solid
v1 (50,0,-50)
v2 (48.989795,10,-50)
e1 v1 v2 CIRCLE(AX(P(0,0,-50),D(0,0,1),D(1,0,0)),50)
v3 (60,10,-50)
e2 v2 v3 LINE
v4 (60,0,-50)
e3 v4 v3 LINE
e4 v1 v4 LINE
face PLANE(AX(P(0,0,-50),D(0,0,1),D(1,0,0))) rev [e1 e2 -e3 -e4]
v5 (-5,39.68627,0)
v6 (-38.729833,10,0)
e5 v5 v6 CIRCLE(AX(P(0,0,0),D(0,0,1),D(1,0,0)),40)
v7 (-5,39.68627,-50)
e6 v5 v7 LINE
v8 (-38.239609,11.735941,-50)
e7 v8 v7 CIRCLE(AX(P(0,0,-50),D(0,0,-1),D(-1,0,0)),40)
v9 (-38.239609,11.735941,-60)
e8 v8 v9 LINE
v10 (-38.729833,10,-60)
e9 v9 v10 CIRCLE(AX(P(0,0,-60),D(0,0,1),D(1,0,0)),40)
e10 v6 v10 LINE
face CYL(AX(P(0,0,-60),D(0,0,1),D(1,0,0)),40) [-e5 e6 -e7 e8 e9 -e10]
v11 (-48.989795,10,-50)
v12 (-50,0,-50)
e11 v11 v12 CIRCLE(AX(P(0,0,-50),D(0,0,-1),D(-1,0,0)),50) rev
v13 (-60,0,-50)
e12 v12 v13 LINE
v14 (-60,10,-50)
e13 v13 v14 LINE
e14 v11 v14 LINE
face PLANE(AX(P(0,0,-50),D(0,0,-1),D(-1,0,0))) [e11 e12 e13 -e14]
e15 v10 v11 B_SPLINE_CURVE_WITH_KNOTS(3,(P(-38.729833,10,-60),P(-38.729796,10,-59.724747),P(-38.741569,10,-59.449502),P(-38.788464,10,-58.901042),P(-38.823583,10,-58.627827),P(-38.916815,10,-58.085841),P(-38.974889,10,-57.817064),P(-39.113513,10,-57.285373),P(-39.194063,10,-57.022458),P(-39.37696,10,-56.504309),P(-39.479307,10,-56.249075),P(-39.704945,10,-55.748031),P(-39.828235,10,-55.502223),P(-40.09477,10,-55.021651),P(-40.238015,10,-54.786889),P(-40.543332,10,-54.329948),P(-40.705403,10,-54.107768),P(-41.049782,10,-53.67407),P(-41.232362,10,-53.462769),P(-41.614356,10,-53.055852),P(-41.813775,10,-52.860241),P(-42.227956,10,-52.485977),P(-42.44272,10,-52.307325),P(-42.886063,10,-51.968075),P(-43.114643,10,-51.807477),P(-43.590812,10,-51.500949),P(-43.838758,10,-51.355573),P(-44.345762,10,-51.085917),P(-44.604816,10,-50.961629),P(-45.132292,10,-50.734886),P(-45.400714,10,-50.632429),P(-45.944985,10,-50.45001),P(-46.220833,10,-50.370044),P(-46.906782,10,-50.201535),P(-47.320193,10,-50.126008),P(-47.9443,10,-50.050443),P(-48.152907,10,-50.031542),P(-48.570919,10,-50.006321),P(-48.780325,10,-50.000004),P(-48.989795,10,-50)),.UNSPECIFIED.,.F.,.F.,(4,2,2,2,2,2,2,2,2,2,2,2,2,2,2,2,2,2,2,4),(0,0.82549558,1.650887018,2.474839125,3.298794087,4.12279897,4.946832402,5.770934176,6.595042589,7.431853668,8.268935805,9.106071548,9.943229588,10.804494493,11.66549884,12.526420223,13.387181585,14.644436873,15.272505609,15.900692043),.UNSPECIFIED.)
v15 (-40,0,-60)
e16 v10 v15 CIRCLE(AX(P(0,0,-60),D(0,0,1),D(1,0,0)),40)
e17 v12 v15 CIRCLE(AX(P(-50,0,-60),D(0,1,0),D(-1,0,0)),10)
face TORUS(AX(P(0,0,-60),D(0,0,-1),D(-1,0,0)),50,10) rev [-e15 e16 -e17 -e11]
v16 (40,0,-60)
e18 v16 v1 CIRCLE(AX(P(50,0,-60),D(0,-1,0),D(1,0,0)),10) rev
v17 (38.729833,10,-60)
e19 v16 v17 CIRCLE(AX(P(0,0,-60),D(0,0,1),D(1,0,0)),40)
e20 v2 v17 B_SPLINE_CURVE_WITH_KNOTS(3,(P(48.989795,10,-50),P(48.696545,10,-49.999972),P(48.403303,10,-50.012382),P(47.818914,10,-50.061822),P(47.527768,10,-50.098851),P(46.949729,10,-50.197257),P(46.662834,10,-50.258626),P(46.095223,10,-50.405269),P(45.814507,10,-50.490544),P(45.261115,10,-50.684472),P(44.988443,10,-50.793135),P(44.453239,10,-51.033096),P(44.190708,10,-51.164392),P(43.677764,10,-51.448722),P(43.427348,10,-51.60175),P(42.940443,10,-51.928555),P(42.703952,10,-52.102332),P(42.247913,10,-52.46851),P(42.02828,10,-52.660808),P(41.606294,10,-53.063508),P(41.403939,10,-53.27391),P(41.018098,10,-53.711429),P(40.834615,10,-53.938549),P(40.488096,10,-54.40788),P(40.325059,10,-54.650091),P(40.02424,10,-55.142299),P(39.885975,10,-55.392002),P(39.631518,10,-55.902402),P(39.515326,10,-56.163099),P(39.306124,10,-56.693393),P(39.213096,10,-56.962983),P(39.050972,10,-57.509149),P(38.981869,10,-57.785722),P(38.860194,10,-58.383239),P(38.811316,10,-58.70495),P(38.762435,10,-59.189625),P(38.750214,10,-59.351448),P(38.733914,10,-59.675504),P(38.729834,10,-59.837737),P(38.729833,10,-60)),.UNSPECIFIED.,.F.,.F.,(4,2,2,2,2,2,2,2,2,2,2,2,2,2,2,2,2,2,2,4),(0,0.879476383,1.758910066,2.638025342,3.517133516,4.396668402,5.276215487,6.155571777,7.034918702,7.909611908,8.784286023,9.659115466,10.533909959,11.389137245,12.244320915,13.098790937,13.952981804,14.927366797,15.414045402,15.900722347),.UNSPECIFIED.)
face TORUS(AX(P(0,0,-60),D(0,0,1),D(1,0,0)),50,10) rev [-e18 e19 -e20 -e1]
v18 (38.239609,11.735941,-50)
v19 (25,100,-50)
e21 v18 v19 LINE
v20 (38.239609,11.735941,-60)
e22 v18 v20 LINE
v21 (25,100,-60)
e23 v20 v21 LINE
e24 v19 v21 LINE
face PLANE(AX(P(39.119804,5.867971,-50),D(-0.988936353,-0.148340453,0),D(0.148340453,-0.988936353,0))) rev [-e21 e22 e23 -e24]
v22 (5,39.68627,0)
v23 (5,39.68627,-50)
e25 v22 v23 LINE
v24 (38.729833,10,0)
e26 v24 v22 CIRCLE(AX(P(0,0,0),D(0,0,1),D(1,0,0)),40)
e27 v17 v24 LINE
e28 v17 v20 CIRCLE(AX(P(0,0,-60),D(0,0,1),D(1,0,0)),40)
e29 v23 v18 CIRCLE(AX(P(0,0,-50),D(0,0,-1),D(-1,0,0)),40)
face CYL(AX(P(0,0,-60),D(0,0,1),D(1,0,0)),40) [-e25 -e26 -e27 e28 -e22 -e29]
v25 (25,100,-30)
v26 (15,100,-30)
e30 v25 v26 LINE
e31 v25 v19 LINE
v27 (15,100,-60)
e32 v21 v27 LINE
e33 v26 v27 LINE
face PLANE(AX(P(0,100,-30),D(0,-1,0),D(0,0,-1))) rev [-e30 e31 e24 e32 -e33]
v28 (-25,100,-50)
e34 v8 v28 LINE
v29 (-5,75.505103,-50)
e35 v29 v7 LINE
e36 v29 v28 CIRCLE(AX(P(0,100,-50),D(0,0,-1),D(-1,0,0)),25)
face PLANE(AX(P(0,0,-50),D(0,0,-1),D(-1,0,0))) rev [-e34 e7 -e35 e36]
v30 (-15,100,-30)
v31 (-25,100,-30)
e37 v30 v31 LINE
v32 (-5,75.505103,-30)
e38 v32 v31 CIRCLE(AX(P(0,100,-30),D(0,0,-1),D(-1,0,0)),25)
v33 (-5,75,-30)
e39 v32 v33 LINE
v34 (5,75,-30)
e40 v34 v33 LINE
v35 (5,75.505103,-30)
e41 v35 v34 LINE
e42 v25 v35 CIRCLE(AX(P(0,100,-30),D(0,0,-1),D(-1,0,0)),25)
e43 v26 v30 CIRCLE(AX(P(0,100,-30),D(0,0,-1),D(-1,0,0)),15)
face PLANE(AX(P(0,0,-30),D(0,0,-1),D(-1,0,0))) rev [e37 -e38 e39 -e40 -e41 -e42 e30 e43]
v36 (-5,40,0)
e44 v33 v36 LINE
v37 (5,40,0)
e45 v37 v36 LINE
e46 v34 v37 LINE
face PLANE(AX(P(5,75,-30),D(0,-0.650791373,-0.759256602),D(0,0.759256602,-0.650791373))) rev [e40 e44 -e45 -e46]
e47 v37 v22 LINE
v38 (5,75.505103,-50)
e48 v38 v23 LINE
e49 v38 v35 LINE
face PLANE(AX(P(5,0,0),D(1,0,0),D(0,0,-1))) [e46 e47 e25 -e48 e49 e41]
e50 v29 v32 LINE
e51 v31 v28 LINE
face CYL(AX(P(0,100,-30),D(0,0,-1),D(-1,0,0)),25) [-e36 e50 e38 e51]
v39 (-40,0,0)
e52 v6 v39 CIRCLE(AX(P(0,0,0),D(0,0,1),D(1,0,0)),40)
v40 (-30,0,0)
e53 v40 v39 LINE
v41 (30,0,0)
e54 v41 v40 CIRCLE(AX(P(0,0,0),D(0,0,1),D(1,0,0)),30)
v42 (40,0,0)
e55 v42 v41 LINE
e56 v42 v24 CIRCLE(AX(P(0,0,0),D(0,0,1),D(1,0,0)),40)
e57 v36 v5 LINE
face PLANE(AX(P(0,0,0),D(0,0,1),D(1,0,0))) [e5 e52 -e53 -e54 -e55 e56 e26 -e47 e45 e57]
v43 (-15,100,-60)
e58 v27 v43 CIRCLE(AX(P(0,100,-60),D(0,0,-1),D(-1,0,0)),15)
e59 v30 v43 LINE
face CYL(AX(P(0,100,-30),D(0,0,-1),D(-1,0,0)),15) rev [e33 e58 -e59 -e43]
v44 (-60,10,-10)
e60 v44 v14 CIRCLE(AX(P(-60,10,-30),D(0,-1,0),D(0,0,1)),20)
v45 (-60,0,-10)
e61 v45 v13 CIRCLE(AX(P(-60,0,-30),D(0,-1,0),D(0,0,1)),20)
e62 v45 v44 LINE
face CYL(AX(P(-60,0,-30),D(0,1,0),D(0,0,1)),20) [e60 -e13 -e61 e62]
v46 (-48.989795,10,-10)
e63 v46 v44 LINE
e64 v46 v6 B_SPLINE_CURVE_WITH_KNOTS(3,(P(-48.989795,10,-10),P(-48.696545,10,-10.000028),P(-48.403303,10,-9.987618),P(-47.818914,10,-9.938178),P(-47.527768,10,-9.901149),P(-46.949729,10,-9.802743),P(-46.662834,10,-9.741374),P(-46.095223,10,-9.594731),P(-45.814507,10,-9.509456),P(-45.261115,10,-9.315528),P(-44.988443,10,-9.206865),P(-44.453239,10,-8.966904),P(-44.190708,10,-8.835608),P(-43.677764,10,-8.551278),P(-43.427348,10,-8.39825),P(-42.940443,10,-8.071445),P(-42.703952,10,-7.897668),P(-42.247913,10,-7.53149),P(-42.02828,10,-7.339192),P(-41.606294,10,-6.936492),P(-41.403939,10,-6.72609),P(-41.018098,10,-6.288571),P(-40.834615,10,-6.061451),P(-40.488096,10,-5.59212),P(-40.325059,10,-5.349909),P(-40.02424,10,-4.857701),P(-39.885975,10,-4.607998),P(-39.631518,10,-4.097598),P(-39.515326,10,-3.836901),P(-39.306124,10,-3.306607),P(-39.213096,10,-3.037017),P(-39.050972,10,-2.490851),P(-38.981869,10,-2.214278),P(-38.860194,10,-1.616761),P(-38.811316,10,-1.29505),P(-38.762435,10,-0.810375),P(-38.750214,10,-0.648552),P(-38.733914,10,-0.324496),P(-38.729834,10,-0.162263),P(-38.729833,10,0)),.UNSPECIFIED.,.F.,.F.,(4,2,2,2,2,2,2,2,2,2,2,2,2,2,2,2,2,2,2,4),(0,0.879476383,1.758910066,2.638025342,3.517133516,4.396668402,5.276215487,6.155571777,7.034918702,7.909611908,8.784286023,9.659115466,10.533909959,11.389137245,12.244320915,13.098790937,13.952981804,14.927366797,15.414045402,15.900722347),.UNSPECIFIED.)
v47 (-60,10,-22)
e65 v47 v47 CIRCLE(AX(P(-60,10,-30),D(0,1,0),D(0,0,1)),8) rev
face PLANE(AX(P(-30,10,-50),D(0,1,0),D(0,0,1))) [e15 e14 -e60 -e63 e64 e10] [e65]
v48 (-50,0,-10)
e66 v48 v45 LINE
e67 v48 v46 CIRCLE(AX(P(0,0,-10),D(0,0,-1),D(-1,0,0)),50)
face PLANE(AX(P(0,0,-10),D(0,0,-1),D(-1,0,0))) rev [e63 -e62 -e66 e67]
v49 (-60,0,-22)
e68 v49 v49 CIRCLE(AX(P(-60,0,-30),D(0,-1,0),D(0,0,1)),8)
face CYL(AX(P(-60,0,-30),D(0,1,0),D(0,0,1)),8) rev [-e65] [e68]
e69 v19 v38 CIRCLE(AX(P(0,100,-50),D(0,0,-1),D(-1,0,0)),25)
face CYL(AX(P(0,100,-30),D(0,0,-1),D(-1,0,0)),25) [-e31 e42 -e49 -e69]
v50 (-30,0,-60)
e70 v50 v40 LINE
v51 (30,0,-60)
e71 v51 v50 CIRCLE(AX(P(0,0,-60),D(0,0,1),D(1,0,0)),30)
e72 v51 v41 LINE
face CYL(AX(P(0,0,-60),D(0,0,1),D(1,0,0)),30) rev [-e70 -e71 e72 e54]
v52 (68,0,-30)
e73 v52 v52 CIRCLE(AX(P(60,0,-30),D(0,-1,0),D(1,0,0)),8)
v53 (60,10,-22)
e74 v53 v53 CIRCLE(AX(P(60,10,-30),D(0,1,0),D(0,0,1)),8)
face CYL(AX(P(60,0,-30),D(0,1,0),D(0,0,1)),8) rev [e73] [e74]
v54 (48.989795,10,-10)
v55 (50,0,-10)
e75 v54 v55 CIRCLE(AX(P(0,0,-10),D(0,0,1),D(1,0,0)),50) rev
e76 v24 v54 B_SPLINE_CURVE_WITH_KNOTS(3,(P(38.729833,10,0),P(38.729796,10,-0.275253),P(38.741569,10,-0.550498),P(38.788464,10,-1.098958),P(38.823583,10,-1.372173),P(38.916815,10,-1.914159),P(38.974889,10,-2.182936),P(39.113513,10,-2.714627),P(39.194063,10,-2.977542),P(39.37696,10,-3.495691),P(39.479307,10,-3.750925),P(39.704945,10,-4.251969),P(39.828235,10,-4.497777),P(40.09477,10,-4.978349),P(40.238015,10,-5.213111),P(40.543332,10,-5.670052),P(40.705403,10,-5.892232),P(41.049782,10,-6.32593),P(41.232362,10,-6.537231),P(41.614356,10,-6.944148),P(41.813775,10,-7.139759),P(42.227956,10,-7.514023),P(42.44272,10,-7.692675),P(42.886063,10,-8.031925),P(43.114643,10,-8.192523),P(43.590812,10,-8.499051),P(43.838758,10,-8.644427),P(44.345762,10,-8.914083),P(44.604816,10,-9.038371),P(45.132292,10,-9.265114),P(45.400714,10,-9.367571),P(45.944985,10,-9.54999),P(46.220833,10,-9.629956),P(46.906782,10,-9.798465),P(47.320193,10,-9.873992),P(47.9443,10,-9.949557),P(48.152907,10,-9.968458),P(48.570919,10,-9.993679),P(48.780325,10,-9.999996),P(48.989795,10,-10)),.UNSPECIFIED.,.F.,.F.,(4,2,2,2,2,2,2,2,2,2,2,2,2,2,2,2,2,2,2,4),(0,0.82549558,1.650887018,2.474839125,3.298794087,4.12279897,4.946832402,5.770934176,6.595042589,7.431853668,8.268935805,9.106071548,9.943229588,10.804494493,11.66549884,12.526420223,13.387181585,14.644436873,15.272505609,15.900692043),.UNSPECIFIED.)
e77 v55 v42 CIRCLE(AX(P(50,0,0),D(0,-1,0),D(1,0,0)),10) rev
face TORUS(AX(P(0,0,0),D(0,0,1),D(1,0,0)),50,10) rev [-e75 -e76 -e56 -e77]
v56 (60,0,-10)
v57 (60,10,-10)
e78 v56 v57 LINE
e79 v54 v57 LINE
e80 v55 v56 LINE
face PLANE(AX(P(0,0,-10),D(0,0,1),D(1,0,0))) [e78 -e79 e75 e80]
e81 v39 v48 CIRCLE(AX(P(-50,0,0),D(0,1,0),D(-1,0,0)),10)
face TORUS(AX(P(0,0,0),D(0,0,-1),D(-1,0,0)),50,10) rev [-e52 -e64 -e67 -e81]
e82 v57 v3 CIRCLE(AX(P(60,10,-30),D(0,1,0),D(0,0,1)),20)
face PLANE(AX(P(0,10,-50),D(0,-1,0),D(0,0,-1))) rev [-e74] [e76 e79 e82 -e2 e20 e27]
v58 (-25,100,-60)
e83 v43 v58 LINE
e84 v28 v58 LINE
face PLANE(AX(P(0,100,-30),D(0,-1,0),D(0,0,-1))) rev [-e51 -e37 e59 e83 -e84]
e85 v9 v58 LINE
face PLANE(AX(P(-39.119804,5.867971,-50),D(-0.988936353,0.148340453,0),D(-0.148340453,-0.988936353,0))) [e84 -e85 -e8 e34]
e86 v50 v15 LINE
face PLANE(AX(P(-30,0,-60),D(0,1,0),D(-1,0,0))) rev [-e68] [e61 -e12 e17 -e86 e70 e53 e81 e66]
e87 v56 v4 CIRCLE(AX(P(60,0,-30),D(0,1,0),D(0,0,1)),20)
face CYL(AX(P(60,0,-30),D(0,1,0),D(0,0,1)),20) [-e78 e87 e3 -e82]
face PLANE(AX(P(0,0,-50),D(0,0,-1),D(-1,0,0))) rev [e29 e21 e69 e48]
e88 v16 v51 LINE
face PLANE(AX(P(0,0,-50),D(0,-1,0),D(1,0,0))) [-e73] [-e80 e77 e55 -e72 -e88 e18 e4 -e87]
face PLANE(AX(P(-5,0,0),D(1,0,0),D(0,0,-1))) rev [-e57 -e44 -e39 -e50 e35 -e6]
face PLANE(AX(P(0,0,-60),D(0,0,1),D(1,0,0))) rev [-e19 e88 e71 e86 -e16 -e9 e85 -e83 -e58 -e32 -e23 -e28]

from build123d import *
from build123d.topology import SkipClean

# Parameters (mm, degrees)
BOSS_EXTRUDE1_START   = -10
BOSS_EXTRUDE1_DEPTH   = 40
SKETCH1_W             = 30
SKETCH1_H             = 10
BOSS_EXTRUDE1_2_DEPTH = 40
EXTRUDE_THIN1_DEPTH   = 60
BOSS_EXTRUDE2_DEPTH   = 30
BOSS_EXTRUDE3_START   = -10
BOSS_EXTRUDE3_DEPTH   = 10
FILLET2_R             = 10
BOSS_EXTRUDE4_DEPTH   = 5
CUT_EXTRUDE1_DEPTH    = 124.693168817
BOSS_EXTRUDE6_DEPTH   = 10


with BuildPart() as part:
    # Sketch1 → Boss-Extrude1 (new body)
    with BuildSketch(Plane.XY.offset(BOSS_EXTRUDE1_START)):
        with BuildLine():
            Line((60, 10), (38.729833462, 10))
            ThreePointArc((38.729833462, 10), (39.681187851, 5.040171699), (40, 0))
            Line((40, 0), (60, 0))
            Line((60, 0), (60, 10))
        make_face()
    extrude(amount=-BOSS_EXTRUDE1_DEPTH)



with BuildPart() as body_2:
    # Sketch1 → Boss-Extrude1 2 (new body)
    with BuildSketch(Plane.XY.offset(BOSS_EXTRUDE1_START)):
        with Locations((-45, 5)):
            Rectangle(SKETCH1_W, SKETCH1_H)
    extrude(amount=-BOSS_EXTRUDE1_2_DEPTH)


with BuildPart() as part_1:
    add(part.part)

    add(body_2.part)  # Extrude-Thin1 merges body 2
    # Sketch1<3> → Extrude-Thin1 (add)
    with BuildSketch(Plane.XY):
        with BuildLine():
            ThreePointArc((30, 0), (0, 30), (-30, 0))
            Line((-30, 0), (-40, 0))
            ThreePointArc((-40, 0), (0, 40), (40, 0))
            Line((40, 0), (30, 0))
        make_face()
    extrude(amount=-EXTRUDE_THIN1_DEPTH)



with BuildPart() as body_2_2:
    # Sketch2 → Boss-Extrude2 (new body)
    with BuildSketch(Plane(origin=(0, 0, -60), x_dir=(-1, 0, 0), z_dir=(0, 0, -1))):
        with BuildLine():
            ThreePointArc((-25, 100), (-17.67766953, 82.32233047), (0, 75))
            Line((0, 75), (0, 85))
            ThreePointArc((0, 85), (-10.606601718, 89.393398282), (-15, 100))
            Line((-15, 100), (-25, 100))
        make_face()
        with BuildLine():
            Line((0, 85), (0, 75))
            ThreePointArc((0, 75), (17.67766953, 82.32233047), (25, 100))
            Line((25, 100), (15, 100))
            ThreePointArc((15, 100), (10.606601718, 89.393398282), (0, 85))
        make_face()
    extrude(amount=-BOSS_EXTRUDE2_DEPTH)


with BuildPart() as part_2:
    add(part_1.part)

    add(body_2_2.part)  # Boss-Extrude3 merges body 2 2
    # Sketch2<5> → Boss-Extrude3 (add)
    with BuildSketch(Plane(origin=(0, 0, -60), x_dir=(-1, 0, 0), z_dir=(0, 0, -1)).offset(BOSS_EXTRUDE3_START)):
        with BuildLine():
            ThreePointArc((-38.239608802, 11.73594132), (-23.775642443, 32.167045659), (0, 40))
            Line((0, 40), (0, 75))
            ThreePointArc((0, 75), (-17.67766953, 82.32233047), (-25, 100))
            Line((-25, 100), (-38.239608802, 11.73594132))
        make_face()
        with BuildLine():
            Line((0, 75), (0, 40))
            ThreePointArc((0, 40), (23.775642443, 32.167045659), (38.239608802, 11.73594132))
            Line((38.239608802, 11.73594132), (25, 100))
            ThreePointArc((25, 100), (17.67766953, 82.32233047), (0, 75))
        make_face()
    extrude(amount=BOSS_EXTRUDE3_DEPTH)

    # Fillet2
    fillet2_edges = [part_2.edges().sort_by_distance(p)[0] for p in [
        (39.681187851, 5.040171699, -50),
        (-39.681187851, 5.040171699, -50),
        (-39.681187851, 5.040171699, -10),
        (39.681187851, 5.040171699, -10),
    ]]
    fillet(fillet2_edges, radius=FILLET2_R - 0.0001)  # a hair under: the kernel refuses the full size

    # Sketch3 → Boss-Extrude4 (add, symmetric)
    with BuildSketch(Plane(origin=(0, 0, 0), x_dir=(0, 0, -1), z_dir=(1, 0, 0))):
        Polygon((30, 75), (0, 40), (0, 37.743013402), (50.362835489, 37.743013402), (50.362835489, 76.354795309), (30, 76.354795309), align=None)
    extrude(amount=BOSS_EXTRUDE4_DEPTH, both=True)

    # Sketch4 → Cut-Extrude1 (cut, through all)
    with BuildSketch(Plane(origin=(0, 10, 0), x_dir=(1, 0, 0), z_dir=(0, 1, 0))):
        with BuildLine():
            Line((60, 22), (60, 38))
            ThreePointArc((60, 38), (52, 30), (60, 22))
        make_face()
        with BuildLine():
            ThreePointArc((68, 30), (65.656854249, 35.656854249), (60, 38))
            Line((60, 38), (60, 22))
            ThreePointArc((60, 22), (65.656854249, 24.343145751), (68, 30))
        make_face()
    cut_extrude1 = extrude(amount=-CUT_EXTRUDE1_DEPTH, mode=Mode.SUBTRACT)

    # Sketch4<7> → Boss-Extrude6 (add)
    with SkipClean():  # the faces are left unmerged after this step: merging them gives an invalid solid
        with BuildSketch(Plane(origin=(0, 10, 0), x_dir=(1, 0, 0), z_dir=(0, 1, 0))):
            with BuildLine():
                ThreePointArc((60, 10), (80, 30), (60, 50))
                Line((60, 50), (60, 38))
                ThreePointArc((60, 38), (65.656854249, 35.656854249), (68, 30))
                ThreePointArc((68, 30), (65.656854249, 24.343145751), (60, 22))
                Line((60, 22), (60, 10))
            make_face()
        boss_extrude6 = extrude(amount=-BOSS_EXTRUDE6_DEPTH)

    # Mirror1: Cut-Extrude1, Boss-Extrude6 across plane
    with SkipClean():  # the faces are left unmerged after this step: merging them gives an invalid solid
        add(cut_extrude1.mirror(Plane(origin=(0, 0, 0), x_dir=(0, 0, 1), z_dir=(1, 0, 0))), mode=Mode.SUBTRACT)
        add(boss_extrude6.mirror(Plane(origin=(0, 0, 0), x_dir=(0, 0, 1), z_dir=(1, 0, 0))))


solid = part_2.part
